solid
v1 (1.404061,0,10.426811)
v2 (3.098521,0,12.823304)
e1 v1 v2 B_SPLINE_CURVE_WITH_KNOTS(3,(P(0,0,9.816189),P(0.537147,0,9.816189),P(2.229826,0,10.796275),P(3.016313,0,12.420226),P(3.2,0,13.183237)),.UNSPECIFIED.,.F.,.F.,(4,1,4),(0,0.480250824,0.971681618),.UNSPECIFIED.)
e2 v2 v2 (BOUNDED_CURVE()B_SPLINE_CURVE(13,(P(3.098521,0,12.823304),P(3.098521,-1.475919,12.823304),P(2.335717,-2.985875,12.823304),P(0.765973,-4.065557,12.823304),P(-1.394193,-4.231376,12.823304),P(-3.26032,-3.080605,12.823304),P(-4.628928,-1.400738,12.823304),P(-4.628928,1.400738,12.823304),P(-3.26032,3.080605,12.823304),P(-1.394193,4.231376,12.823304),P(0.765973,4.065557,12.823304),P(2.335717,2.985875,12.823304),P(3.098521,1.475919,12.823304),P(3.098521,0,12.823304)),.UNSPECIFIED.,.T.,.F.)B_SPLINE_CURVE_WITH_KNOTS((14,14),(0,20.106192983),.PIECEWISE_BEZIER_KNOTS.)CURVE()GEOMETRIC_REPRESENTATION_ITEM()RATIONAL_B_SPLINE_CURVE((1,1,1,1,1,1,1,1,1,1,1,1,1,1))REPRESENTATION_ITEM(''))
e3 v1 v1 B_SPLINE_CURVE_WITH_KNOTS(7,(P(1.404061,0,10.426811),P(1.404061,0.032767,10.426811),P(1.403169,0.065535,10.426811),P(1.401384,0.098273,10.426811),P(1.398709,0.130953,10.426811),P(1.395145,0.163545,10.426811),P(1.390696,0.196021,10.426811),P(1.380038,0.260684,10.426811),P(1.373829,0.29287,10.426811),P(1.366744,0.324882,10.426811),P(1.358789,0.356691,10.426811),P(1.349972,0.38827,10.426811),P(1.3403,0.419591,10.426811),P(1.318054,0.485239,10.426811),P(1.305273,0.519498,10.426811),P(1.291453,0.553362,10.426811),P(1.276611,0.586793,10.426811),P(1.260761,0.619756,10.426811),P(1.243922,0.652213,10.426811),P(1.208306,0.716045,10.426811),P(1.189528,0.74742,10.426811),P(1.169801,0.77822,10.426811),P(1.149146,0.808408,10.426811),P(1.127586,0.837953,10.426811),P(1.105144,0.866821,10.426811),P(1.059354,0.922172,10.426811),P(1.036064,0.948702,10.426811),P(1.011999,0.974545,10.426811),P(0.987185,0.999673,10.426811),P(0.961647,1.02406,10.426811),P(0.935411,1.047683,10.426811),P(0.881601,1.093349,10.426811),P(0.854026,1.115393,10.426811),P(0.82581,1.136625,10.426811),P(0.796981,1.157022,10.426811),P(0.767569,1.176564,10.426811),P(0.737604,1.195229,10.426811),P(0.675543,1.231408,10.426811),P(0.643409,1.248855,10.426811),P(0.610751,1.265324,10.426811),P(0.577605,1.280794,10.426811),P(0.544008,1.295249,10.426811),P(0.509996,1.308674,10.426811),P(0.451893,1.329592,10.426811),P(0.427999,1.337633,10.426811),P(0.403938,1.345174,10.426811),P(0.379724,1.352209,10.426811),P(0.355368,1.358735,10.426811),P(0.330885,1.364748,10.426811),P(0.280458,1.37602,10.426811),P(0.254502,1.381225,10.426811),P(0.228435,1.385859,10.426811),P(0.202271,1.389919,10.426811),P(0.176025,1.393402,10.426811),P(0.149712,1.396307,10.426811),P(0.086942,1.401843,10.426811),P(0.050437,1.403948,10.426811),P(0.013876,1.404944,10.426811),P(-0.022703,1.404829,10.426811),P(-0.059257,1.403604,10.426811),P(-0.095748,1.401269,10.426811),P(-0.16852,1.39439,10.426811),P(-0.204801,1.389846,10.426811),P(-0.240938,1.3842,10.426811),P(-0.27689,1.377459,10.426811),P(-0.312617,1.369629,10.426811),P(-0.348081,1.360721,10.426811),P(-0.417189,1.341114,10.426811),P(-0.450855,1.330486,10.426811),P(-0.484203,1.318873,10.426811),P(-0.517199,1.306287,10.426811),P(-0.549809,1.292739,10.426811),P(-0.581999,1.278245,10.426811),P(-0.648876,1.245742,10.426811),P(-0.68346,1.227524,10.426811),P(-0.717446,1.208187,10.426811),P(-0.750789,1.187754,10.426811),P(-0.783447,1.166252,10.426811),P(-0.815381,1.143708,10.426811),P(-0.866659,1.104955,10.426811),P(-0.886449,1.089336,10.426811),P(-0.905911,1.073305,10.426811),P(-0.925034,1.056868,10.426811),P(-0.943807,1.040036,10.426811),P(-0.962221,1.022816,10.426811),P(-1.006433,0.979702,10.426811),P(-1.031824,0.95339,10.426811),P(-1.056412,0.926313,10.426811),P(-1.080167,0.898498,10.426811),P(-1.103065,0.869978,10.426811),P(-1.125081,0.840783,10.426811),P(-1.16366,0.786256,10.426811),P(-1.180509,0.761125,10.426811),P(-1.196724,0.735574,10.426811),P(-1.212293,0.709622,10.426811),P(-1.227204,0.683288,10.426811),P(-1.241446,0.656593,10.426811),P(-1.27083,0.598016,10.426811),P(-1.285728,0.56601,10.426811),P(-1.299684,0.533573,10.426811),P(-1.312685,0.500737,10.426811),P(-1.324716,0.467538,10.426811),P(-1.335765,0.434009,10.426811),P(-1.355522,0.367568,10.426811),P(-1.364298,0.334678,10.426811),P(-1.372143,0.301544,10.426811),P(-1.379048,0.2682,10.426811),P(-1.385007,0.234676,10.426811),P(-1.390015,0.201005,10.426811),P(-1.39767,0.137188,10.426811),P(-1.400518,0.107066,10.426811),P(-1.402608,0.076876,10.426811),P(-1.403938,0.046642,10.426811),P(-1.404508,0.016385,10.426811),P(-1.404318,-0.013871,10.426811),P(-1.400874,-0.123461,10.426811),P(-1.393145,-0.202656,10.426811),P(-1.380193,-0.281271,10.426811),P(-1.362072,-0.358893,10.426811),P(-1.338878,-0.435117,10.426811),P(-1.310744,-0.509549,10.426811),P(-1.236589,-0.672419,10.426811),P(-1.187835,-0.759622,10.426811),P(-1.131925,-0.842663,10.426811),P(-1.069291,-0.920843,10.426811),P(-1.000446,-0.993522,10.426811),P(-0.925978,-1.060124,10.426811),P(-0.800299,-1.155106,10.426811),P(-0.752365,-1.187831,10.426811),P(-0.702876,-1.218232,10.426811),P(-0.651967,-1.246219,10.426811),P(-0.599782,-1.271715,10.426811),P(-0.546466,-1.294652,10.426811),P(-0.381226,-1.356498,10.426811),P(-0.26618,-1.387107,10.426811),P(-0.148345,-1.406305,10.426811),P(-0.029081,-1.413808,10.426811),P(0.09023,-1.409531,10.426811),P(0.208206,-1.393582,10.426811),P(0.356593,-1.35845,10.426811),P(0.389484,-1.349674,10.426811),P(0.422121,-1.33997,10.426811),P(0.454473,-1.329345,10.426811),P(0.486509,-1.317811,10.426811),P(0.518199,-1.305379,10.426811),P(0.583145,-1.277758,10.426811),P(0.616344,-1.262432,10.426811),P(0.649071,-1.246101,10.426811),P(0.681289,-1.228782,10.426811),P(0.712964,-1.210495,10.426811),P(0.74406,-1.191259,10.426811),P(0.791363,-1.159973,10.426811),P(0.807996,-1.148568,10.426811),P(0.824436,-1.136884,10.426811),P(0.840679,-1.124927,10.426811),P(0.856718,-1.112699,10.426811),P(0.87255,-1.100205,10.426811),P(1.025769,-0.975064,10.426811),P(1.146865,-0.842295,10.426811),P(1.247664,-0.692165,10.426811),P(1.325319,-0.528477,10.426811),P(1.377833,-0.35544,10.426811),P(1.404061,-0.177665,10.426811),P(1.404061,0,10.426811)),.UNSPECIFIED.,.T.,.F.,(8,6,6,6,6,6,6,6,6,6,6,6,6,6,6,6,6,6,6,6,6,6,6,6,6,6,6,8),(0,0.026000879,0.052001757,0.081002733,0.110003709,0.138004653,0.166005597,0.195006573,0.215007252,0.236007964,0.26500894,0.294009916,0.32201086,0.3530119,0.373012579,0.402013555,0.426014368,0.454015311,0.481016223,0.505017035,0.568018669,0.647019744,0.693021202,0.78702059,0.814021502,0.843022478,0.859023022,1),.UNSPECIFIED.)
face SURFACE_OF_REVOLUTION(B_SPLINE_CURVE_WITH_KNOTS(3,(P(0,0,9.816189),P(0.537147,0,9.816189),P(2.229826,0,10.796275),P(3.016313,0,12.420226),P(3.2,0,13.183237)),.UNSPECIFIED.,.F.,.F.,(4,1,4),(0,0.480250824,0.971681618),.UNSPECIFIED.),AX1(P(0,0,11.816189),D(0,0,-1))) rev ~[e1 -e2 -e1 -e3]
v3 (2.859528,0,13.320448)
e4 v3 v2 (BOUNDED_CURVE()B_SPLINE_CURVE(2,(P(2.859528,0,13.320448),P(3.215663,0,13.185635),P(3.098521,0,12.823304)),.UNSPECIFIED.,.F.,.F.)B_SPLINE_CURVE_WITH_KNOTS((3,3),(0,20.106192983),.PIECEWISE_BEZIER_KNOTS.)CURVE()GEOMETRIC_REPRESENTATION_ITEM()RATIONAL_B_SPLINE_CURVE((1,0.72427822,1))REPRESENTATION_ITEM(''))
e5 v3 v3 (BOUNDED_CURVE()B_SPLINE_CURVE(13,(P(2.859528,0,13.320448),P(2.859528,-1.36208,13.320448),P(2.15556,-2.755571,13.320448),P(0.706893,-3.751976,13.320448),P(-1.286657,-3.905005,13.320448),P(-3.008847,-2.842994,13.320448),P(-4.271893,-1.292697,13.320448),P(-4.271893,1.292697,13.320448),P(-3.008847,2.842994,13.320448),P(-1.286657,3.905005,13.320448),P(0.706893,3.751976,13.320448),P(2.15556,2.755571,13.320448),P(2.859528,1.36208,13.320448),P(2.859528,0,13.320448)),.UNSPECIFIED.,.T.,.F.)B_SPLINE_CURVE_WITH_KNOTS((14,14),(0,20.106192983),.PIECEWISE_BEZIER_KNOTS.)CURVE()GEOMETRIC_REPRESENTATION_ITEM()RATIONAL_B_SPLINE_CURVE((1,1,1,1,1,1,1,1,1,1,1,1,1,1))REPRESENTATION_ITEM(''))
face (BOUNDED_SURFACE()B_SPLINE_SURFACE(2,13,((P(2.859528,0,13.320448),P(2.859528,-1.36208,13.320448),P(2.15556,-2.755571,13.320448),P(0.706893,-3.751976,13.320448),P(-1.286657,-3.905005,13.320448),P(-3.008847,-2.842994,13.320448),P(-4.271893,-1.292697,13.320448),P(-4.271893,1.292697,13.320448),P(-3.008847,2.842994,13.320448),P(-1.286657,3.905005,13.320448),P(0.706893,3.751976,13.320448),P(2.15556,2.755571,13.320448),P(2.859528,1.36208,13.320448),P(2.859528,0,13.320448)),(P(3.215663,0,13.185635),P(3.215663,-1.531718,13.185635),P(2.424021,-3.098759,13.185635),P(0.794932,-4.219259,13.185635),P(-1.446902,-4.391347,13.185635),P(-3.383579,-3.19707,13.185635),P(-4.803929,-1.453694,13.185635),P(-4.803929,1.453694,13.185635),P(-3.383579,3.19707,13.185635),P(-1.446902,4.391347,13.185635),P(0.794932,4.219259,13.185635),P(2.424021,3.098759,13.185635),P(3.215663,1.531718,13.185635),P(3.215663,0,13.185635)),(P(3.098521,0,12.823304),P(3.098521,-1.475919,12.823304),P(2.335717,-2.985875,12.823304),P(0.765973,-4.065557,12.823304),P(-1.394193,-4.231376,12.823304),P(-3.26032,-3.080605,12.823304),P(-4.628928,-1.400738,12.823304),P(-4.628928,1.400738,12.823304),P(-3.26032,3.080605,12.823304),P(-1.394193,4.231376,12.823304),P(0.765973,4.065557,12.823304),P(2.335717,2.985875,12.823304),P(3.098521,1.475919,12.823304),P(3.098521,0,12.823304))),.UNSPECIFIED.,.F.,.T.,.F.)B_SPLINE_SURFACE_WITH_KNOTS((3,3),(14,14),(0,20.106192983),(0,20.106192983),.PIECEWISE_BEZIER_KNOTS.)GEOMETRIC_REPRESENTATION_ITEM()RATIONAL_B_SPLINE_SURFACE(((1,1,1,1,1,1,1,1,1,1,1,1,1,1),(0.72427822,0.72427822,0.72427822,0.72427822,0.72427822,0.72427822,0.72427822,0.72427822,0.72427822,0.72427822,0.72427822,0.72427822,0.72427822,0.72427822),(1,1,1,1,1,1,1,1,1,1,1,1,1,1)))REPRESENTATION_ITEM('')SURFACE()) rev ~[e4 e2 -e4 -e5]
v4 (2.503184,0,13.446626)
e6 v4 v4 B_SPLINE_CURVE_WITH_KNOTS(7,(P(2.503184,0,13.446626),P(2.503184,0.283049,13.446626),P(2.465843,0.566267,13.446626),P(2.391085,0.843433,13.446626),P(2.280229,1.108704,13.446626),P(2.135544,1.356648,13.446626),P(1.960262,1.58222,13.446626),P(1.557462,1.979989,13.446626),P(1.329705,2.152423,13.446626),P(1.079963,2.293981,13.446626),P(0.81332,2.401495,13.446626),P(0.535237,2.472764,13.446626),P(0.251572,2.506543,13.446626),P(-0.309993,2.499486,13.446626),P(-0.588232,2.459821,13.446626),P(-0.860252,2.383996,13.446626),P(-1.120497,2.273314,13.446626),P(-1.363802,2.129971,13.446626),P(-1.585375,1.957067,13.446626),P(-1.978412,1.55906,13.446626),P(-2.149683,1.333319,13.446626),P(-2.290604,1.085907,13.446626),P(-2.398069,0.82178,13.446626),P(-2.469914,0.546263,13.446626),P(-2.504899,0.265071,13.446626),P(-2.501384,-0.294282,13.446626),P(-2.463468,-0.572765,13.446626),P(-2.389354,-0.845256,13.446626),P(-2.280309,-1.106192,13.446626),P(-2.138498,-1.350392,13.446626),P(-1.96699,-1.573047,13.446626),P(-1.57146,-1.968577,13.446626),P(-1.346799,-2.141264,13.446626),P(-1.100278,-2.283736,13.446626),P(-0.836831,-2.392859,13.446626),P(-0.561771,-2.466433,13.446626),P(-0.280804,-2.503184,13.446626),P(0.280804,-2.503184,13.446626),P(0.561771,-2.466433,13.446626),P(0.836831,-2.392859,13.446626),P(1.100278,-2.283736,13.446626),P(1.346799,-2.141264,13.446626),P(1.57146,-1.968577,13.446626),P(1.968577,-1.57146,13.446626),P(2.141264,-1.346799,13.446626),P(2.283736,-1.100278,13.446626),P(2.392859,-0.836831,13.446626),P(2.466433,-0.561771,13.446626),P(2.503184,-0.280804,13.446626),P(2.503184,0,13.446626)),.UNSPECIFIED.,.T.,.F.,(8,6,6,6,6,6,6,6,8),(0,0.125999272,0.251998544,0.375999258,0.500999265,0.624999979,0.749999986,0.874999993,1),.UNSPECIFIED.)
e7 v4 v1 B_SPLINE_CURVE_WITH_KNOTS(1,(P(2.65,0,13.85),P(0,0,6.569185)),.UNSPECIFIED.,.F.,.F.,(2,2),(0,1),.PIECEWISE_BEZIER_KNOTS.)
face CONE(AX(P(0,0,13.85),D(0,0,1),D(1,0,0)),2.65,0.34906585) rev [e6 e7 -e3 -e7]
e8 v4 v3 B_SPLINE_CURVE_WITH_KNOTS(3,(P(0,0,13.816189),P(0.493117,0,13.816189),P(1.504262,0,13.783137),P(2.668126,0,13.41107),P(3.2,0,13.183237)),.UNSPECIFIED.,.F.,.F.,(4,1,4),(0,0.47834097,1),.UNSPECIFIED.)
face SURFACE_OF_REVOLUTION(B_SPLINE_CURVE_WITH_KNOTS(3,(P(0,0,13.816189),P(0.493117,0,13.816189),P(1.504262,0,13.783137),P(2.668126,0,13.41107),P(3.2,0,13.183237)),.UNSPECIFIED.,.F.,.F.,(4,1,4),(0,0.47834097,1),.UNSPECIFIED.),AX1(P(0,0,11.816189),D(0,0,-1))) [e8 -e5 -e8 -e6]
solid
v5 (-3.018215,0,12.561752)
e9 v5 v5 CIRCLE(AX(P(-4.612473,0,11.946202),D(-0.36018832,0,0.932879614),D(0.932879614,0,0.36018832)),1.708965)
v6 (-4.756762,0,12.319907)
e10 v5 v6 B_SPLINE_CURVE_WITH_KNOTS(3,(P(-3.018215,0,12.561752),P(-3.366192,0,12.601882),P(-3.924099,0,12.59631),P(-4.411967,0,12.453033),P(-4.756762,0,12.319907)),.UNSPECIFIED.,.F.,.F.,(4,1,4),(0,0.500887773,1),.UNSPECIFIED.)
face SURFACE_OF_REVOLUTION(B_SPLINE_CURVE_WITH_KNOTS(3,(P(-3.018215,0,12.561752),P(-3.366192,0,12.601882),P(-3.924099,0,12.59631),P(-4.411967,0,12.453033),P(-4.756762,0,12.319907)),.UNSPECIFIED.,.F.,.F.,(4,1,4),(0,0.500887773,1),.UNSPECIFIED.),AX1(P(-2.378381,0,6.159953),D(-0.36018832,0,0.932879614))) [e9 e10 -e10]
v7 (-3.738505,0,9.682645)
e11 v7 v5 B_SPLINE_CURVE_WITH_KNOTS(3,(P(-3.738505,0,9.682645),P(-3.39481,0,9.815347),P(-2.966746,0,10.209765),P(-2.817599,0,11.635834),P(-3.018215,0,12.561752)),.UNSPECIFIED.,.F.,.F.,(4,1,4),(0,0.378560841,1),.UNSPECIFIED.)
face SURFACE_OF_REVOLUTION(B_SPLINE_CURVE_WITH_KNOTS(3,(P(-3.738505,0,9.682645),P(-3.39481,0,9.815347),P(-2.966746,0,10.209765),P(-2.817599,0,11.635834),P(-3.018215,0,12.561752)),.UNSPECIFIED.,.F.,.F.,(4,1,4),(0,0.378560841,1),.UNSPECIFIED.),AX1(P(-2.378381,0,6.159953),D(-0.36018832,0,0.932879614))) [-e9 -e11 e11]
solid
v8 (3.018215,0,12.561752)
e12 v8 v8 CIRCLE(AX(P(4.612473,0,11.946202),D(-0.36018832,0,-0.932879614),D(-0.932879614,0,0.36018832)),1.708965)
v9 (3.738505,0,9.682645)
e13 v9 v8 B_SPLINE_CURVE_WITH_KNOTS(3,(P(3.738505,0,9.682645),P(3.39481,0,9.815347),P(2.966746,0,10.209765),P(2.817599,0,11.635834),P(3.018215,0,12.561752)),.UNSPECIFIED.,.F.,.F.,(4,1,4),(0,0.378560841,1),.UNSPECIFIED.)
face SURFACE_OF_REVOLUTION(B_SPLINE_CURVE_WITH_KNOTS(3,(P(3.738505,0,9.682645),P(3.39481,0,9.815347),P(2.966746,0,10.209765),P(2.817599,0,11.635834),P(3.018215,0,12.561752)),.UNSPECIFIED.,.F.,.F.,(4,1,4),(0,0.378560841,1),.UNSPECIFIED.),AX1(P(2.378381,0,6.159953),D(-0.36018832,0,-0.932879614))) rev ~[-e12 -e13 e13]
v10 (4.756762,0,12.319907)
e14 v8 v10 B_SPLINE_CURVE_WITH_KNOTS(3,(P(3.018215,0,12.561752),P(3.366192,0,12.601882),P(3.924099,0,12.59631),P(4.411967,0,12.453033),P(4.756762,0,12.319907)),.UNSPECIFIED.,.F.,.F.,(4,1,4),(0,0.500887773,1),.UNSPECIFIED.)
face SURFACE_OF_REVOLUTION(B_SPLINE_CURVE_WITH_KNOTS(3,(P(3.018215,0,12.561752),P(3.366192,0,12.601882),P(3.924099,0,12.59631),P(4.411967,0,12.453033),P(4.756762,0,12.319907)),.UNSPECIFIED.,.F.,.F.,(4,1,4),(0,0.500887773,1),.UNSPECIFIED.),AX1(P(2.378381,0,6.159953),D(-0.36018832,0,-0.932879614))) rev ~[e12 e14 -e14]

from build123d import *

# Parameters (mm, degrees)
F3_R = 2.65
F5_R = 0.4


# Not quite as in the source:
# - an extrude whose draft closes it to a point is written as a loft to that point


with BuildPart() as f1:
    # F0 (on Front) → F1 (revolve)
    with BuildSketch(Plane.XZ):
        with BuildLine():
            add(Edge.make_bspline(
                [(0, 13.816189227), (0.493117217, 13.816189227), (1.5042615966, 13.783137193), (2.6681258699, 13.4110701894), (3.2, 13.1832365588)],
                knots=[0, 0, 0, 0, 0.4783409697, 1, 1, 1, 1], degree=3))
            Line((0, 13.816189227), (0, 9.816189227))
            add(Edge.make_bspline(
                [(0, 9.816189227), (0.5371469513, 9.816189227), (2.2298259658, 10.7962754001), (3.0163129366, 12.4202263928), (3.2, 13.1832365588)],
                knots=[0, 0, 0, 0, 0.4802508239, 0.9716816175, 0.9716816175, 0.9716816175, 0.9716816175], degree=3))
        make_face()
    revolve(axis=Axis((0, 0, 11.816189227), (0, 0, -1)))

    # F3 (on offset) → F4 section 0
    with BuildSketch(Plane.XY.offset(13.85), mode=Mode.PRIVATE) as f4_s0:
        Circle(F3_R)
    loft([f4_s0.sketch, Vertex(0, 0, 6.5691848384)], ruled=True, mode=Mode.SUBTRACT)

    # F5
    f5_edges = [f1.edges().sort_by_distance(p)[0] for p in [
        (-3.2, 0, 13.183237),
    ]]
    fillet(f5_edges, radius=F5_R)


with BuildPart() as f7:
    # F6 (on Front) → F7 (revolve)
    with BuildSketch(Plane.XZ):
        with BuildLine():
            add(Edge.make_bspline(
                [(-3.0182146002, 12.5617515296), (-3.366192171, 12.601881569), (-3.9240989414, 12.5963100462), (-4.4119666474, 12.4530334641), (-4.7567621805, 12.3199066147)],
                knots=[0, 0, 0, 0, 0.5008877726, 1, 1, 1, 1], degree=3))
            Line((-4.7567621805, 12.3199066147), (-3.7385054336, 9.6826446378))
            add(Edge.make_bspline(
                [(-3.7385054336, 9.6826446378), (-3.3948102019, 9.8153466566), (-2.9667460836, 10.2097649857), (-2.8175992193, 11.6358339578), (-3.0182146002, 12.5617515296)],
                knots=[0, 0, 0, 0, 0.378560841, 1, 1, 1, 1], degree=3))
        make_face()
    revolve(axis=Axis((-2.3783810902, 0, 6.1599533074), (-0.36018832, 0, 0.9328796139)))


with BuildPart() as f8_1:
    # F8: instance of F7
    add(f7.part.mirror(Plane.YZ))


solid = Compound([f1.part, f7.part, f8_1.part])
